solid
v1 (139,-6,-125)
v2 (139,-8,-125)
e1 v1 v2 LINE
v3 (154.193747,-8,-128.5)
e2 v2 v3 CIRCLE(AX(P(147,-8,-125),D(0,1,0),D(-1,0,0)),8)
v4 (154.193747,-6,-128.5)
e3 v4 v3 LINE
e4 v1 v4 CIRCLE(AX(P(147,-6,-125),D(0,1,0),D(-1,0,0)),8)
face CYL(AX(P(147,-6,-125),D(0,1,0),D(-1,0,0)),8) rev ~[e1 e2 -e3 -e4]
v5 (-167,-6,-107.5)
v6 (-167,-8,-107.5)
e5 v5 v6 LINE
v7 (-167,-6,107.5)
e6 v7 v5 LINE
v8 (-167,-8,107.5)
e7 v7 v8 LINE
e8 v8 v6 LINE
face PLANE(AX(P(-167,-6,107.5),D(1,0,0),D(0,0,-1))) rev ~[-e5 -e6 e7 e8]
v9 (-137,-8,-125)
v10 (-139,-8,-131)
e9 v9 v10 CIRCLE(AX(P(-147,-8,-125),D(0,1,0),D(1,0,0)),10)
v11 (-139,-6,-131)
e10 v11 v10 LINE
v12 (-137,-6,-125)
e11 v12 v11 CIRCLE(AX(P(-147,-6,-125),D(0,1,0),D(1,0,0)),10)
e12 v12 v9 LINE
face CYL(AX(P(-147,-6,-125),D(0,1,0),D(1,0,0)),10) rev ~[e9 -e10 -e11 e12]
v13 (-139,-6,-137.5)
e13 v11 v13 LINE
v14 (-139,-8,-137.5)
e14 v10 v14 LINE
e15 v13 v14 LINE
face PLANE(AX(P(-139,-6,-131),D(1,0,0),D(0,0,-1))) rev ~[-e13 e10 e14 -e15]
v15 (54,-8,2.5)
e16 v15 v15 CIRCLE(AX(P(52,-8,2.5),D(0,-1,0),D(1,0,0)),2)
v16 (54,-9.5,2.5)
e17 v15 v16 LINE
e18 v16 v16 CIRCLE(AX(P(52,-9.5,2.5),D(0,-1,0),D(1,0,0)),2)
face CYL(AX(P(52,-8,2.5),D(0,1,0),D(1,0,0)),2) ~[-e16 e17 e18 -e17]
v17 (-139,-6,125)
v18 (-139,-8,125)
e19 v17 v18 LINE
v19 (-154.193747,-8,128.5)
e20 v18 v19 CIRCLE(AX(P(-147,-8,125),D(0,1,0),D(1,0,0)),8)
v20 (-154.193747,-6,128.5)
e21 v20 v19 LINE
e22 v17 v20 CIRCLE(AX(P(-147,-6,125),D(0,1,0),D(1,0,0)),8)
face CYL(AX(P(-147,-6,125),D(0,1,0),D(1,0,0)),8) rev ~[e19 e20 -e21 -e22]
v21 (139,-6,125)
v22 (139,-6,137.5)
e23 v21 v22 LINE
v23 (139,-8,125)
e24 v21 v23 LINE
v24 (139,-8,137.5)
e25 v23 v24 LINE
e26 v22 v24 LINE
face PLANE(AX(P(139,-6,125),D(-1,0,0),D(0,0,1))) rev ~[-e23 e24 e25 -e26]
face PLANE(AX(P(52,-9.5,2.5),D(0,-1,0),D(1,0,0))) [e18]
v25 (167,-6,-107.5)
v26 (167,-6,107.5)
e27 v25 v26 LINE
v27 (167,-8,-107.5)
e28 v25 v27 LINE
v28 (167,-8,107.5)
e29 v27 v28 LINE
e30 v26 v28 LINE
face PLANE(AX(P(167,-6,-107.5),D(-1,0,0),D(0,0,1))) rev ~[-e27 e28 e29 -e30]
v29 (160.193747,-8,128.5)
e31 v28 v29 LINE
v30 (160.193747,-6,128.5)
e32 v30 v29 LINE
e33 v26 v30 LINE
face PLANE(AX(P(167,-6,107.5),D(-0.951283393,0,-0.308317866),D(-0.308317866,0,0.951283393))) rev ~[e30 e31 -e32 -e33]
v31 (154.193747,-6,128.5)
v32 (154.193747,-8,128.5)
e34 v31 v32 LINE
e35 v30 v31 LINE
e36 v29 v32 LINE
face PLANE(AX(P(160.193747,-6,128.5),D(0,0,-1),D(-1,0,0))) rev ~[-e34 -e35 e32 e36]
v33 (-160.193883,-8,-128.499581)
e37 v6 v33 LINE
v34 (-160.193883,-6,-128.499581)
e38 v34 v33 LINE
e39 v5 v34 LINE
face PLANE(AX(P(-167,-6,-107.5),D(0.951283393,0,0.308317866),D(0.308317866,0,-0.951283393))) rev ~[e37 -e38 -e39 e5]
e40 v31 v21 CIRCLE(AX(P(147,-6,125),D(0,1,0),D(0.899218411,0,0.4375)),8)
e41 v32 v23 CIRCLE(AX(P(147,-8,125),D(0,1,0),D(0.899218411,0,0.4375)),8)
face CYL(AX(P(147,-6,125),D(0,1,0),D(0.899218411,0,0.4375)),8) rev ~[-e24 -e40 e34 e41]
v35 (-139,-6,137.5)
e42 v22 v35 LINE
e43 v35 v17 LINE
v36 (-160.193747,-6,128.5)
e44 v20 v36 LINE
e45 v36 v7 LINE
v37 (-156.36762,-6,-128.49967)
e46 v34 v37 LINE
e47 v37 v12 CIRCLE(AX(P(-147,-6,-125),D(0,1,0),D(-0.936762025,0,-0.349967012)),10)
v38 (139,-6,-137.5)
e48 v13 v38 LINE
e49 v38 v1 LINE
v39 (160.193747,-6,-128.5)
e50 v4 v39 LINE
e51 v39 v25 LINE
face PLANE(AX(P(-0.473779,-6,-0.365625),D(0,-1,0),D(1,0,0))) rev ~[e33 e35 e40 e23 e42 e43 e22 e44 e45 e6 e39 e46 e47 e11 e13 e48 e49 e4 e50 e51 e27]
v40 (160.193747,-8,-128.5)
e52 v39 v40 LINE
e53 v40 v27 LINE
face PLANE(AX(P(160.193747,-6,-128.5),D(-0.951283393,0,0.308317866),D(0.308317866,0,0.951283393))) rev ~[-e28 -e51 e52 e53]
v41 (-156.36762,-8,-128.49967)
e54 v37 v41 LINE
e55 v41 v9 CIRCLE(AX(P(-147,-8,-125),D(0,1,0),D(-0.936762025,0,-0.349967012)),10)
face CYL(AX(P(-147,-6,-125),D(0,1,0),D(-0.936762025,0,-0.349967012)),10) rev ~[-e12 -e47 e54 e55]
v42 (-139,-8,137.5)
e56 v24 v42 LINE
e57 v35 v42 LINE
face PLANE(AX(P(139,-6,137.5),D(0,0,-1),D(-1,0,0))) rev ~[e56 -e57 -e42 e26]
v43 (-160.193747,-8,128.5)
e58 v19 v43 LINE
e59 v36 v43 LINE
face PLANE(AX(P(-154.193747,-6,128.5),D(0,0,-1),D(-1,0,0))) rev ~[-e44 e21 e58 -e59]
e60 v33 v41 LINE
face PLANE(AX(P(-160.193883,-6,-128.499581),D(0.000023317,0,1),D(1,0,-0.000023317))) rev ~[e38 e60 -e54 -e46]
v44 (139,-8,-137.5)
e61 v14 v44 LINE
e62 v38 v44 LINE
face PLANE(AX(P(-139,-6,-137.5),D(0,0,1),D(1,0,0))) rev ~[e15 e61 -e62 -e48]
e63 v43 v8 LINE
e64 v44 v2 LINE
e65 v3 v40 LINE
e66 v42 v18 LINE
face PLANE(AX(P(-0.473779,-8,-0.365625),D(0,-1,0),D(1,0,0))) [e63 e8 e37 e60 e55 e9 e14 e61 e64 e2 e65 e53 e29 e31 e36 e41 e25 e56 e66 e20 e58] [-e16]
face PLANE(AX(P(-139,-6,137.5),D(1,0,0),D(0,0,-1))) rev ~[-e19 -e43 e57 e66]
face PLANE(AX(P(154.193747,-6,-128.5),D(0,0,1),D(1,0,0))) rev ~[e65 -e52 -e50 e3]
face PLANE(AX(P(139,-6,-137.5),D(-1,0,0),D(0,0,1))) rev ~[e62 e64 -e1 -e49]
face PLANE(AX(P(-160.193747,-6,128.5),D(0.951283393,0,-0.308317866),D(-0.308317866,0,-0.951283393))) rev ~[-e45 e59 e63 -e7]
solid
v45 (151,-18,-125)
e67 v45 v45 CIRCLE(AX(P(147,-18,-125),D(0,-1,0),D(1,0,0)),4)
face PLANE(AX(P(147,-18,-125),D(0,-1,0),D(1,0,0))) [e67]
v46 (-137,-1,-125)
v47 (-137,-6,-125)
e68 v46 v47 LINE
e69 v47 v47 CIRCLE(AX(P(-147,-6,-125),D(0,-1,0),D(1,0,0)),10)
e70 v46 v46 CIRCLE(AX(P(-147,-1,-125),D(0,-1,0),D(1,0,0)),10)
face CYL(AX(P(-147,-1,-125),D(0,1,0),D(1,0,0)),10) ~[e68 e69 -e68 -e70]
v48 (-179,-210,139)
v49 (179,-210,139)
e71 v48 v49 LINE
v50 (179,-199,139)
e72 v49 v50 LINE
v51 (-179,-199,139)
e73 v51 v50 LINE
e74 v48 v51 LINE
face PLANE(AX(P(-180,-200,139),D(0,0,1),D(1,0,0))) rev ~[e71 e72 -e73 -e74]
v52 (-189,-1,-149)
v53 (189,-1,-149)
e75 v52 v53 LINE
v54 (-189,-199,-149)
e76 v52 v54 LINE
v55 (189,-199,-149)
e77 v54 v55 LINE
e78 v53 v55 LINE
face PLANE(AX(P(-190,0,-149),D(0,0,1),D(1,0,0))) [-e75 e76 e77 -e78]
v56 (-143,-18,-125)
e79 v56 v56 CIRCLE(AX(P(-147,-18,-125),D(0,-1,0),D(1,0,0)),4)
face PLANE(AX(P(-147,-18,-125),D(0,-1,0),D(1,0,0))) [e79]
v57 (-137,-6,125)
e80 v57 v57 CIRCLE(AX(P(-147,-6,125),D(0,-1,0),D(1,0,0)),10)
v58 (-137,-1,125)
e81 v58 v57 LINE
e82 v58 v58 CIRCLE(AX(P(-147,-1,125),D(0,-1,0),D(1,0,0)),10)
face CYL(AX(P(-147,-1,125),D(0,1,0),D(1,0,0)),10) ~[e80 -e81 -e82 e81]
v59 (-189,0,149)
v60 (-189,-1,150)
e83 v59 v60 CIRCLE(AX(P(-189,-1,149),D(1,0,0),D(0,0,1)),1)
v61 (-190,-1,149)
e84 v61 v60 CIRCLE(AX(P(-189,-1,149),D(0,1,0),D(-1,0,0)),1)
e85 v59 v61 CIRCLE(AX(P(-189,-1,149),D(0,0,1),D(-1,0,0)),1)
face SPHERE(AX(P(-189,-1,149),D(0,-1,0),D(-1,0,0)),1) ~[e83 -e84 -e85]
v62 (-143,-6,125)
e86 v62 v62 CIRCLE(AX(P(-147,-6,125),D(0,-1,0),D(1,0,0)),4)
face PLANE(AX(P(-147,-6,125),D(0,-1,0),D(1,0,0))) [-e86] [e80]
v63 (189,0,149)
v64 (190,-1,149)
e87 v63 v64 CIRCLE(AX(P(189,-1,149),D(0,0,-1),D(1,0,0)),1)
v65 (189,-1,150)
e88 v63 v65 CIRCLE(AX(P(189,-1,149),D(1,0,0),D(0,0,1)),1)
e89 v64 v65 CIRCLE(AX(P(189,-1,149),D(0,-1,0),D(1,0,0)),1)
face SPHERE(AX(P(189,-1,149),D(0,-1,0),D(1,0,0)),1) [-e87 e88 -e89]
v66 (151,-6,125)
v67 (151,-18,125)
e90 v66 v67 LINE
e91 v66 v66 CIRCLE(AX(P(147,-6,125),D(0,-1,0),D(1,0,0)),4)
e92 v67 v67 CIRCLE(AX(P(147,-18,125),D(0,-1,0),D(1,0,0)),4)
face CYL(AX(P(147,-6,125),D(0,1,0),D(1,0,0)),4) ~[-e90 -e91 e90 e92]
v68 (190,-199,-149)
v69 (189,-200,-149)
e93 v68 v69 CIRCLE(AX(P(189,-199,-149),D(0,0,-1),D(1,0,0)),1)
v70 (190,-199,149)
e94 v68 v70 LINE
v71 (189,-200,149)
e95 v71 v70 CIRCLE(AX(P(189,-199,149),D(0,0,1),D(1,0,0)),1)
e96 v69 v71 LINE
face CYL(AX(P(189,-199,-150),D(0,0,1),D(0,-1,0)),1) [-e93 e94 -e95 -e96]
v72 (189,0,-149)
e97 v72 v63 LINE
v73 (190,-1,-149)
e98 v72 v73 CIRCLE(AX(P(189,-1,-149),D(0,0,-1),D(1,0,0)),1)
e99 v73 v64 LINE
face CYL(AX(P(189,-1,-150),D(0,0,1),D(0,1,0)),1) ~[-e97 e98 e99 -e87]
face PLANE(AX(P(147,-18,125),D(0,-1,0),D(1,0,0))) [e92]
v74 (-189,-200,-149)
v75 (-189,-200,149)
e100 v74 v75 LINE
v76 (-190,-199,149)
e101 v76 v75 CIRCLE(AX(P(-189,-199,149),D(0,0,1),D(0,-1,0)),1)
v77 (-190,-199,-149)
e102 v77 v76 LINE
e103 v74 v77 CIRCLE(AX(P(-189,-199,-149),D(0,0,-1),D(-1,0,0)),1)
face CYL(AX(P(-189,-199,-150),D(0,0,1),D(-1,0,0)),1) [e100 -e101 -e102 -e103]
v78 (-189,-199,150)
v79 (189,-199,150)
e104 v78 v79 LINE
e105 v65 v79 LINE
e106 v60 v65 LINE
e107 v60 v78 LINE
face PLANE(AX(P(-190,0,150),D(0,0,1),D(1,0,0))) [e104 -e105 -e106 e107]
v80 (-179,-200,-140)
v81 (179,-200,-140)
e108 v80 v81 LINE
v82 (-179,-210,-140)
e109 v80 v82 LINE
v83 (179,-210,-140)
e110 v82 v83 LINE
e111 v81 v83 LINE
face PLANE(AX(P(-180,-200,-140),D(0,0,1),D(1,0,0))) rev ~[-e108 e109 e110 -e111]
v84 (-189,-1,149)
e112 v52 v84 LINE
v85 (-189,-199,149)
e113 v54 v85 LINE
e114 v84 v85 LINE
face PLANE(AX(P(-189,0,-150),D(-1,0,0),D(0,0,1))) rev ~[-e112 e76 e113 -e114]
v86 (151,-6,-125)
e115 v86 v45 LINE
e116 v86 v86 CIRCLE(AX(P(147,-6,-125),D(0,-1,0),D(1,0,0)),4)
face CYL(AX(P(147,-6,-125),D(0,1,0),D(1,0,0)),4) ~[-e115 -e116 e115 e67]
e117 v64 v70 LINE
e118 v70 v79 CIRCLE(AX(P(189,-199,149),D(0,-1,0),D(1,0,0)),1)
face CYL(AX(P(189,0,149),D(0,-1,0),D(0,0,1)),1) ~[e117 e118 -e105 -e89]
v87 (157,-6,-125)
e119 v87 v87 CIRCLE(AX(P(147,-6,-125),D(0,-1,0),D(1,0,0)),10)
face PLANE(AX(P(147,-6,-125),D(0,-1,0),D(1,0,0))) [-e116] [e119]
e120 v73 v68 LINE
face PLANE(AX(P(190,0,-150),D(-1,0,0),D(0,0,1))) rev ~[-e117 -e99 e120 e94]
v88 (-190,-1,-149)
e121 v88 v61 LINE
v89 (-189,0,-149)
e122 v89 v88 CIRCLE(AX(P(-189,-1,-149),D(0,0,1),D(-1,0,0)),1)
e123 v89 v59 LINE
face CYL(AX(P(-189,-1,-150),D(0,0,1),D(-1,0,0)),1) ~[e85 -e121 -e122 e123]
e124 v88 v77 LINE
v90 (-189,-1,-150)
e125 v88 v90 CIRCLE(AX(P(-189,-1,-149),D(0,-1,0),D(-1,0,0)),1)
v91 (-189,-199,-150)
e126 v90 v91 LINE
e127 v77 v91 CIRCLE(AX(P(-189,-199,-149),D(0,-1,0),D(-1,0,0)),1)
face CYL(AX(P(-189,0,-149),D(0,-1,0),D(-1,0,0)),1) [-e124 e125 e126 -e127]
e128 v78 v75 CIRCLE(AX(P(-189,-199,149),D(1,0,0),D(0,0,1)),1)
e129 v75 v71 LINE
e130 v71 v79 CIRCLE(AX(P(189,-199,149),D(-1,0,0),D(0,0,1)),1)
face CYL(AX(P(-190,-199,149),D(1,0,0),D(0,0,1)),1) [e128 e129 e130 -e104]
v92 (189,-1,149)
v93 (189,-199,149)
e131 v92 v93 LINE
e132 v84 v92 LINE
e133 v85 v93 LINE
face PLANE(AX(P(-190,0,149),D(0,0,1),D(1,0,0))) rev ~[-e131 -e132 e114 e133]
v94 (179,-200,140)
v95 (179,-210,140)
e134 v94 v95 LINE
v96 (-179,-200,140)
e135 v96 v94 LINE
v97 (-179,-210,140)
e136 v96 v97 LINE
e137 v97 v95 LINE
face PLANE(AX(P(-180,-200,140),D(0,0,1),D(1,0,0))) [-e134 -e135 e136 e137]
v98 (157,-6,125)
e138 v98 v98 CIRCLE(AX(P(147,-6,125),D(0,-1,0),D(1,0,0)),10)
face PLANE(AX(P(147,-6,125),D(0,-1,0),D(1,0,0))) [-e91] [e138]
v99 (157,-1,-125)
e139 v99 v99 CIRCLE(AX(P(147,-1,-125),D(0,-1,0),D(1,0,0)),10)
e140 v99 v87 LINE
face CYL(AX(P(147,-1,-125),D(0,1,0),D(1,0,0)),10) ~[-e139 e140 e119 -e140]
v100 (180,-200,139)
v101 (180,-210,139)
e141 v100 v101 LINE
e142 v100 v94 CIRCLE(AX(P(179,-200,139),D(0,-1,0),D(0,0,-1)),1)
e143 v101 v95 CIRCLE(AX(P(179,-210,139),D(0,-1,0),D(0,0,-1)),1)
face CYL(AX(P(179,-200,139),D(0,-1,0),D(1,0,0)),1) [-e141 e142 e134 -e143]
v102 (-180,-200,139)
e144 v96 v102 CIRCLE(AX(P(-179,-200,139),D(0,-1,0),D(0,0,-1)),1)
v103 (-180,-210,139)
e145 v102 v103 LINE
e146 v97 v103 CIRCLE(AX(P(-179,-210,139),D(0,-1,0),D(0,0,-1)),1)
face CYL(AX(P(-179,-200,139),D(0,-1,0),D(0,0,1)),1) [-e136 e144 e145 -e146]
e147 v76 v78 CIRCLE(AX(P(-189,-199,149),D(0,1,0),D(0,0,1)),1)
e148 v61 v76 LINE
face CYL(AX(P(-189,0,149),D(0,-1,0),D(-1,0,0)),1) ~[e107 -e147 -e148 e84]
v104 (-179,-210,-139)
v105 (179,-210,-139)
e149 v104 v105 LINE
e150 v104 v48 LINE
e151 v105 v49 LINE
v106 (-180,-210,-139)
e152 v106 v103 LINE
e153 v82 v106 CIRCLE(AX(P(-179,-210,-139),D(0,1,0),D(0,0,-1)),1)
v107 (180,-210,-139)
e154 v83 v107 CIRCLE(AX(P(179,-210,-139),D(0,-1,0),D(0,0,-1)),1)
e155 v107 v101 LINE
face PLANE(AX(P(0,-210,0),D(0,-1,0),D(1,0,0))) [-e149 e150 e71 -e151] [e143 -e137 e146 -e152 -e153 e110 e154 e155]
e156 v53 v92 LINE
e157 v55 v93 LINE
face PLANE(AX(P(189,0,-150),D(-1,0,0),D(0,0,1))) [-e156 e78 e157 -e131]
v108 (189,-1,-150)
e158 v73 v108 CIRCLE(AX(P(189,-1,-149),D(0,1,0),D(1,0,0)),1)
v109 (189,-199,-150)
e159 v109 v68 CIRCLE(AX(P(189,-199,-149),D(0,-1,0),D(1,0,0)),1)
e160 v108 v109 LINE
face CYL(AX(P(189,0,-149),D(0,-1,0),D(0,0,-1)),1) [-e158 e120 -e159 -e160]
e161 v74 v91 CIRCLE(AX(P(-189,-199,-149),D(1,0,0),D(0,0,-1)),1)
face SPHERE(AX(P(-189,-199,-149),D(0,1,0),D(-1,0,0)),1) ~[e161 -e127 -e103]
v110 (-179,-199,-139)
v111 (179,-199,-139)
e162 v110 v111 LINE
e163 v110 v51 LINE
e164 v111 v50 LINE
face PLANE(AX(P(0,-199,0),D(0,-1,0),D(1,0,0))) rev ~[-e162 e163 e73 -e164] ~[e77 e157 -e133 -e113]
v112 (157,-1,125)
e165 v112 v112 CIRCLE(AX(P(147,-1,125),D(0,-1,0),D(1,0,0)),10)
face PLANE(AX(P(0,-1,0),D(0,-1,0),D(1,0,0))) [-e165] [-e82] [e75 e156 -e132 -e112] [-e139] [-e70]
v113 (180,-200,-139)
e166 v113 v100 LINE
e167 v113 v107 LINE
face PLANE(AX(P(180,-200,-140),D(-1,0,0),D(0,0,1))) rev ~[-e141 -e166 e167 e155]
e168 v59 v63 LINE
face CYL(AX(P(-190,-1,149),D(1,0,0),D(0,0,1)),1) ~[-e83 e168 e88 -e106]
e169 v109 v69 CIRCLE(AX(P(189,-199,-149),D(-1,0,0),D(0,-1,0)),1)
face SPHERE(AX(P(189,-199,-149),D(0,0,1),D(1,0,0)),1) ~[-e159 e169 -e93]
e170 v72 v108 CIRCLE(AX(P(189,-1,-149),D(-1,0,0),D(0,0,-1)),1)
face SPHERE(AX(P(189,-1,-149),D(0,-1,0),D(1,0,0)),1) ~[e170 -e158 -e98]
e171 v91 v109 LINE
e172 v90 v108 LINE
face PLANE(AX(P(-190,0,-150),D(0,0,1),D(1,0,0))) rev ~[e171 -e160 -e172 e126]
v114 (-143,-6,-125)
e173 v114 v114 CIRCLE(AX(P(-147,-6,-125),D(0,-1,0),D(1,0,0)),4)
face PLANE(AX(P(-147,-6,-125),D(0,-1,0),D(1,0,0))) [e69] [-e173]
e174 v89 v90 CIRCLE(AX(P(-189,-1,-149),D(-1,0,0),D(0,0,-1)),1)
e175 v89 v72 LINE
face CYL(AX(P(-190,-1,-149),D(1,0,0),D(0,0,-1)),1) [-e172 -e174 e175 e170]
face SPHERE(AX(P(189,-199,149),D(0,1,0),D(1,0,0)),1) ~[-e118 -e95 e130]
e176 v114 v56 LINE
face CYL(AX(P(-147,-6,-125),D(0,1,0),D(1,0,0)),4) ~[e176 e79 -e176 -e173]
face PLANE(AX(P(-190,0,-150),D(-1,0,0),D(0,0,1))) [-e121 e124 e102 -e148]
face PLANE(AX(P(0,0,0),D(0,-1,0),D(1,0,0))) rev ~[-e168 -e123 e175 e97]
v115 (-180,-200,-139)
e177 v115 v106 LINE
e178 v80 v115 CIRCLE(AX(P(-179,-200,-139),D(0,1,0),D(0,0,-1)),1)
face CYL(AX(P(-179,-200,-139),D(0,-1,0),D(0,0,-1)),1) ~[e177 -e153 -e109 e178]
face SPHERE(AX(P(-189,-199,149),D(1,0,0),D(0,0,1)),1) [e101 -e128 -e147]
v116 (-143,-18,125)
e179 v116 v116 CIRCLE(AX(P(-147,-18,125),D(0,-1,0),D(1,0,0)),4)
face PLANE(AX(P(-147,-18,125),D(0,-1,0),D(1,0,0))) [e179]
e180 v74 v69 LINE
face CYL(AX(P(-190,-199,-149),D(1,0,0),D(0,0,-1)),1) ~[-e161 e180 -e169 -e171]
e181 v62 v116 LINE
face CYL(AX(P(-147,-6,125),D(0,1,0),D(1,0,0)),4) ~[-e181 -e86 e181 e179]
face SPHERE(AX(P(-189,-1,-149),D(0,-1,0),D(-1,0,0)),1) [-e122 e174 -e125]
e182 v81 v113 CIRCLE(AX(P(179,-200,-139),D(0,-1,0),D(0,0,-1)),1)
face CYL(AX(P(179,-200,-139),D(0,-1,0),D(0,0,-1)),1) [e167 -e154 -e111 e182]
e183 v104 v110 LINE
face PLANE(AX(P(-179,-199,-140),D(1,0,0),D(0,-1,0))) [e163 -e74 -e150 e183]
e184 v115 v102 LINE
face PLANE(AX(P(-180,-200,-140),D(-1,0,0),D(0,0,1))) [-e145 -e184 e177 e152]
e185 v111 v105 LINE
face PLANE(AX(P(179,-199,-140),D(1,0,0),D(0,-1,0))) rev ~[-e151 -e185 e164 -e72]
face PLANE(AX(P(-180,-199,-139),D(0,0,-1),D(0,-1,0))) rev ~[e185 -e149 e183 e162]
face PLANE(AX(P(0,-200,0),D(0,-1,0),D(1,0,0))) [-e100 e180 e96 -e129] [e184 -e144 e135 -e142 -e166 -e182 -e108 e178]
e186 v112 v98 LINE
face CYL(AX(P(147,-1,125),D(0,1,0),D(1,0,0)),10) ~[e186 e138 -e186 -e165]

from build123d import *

# Parameters (mm, degrees)
F0_W         = 380
F0_H         = 300
F1_DEPTH     = 200
F2_W         = 360
F2_H         = 280
F3_DEPTH     = 10
F4_R         = 1
F5_T         = 1
F5_T3_DEPTH  = 280
F5_T5_DEPTH  = 360
F5_T8_ANGLE  = 90.000000001
F5_T10_ANGLE = 90.000000001
F5_T12_ANGLE = 90.000000001
F5_T14_ANGLE = 90.000000001
F6_R         = 10
F6_R_2       = 4
F7_DEPTH     = 5
F8_R         = 4
F9_DEPTH     = 12
F11_DEPTH    = 2
F12_R        = 2
F13_DEPTH    = 1.5


# Not quite as in the source:
# - a shell that OpenCascade refuses in one call is made with other operations: the cavity is built on its own and cut out


with BuildPart() as f1:
    # F0 (on Front) → F1 (new body)
    with BuildSketch(Plane.XZ):
        Rectangle(F0_W, F0_H)
    extrude(amount=F1_DEPTH)

    # F2 (on face) → F3 (join)
    with BuildSketch(Plane.XZ.offset(200)):
        Rectangle(F2_W, F2_H)
    extrude(amount=F3_DEPTH)

    # F4
    f4_edges = [f1.edges().sort_by_distance(p)[0] for p in [
        (190, -100, 150),
        (190, -200, 0),
        (190, -100, -150),
        (190, 0, 0),
        (0, -200, 150),
        (-190, -100, 150),
        (-190, -100, -150),
        (-190, -200, 0),
        (-190, 0, 0),
        (0, 0, 150),
        (0, -200, -150),
        (0, 0, -150),
        (180, -205, 140),
        (-180, -205, 140),
        (180, -205, -140),
        (-180, -205, -140),
    ]]
    fillet(f4_edges, radius=F4_R)

    # F5: shell of thickness 1, made by hand


with BuildPart() as f5_core1:
    # F5_t2: copy of F1
    add(f1.part)

    # the walls: a layer under each face that stays
    f5_faces = [f5_core1.faces().sort_by_distance(p)[0] for p in [
        (190, -100, 0),
        (0, -100, 150),
        (0, 0, 0),
        (129.9375, -200, -145.3209876543),
        (0, -100, -150),
        (180, -205, 0),
        (0, -205, -140),
        (0, -205, 140),
        (-180, -205, 0),
        (-190, -100, 0),
    ]]
    thicken(f5_faces, amount=-F5_T, mode=Mode.SUBTRACT)

    # F5_s4 → F5_t3 (cut)
    with BuildSketch(Plane.XY.offset(-140)):
        Polygon((180.01, -200.01), (180, -199), (179, -199), (179, -200), align=None)
        Polygon((-180.01, -200.01), (-180, -199), (-179, -199), (-179, -200), align=None)
    extrude(amount=F5_T3_DEPTH, mode=Mode.SUBTRACT)

    # F5_s6 → F5_t5 (cut)
    with BuildSketch(Plane.YZ.offset(-180)):
        Polygon((-200.01, -140.01), (-199, -140), (-199, -139), (-200, -139), align=None)
        Polygon((-200.01, 140.01), (-199, 140), (-199, 139), (-200, 139), align=None)
    extrude(amount=F5_T5_DEPTH, mode=Mode.SUBTRACT)

    # F5_s7 → F5_t8 (revolve, cut)
    with BuildSketch(Plane.XY.offset(-139)):
        Polygon((180.01, -200.01), (180, -199), (179, -199), (179, -200), align=None)
    revolve(axis=Axis((179, -200, -139), (0, 1, 0)), revolution_arc=F5_T8_ANGLE, mode=Mode.SUBTRACT)

    # F5_s9 → F5_t10 (revolve, cut)
    with BuildSketch(Plane.XY.offset(139)):
        Polygon((180.01, -200.01), (180, -199), (179, -199), (179, -200), align=None)
    revolve(axis=Axis((179, -200, 139), (0, -1, 0)), revolution_arc=F5_T10_ANGLE, mode=Mode.SUBTRACT)

    # F5_s11 → F5_t12 (revolve, cut)
    with BuildSketch(Plane.XY.offset(-139)):
        Polygon((-180.01, -200.01), (-180, -199), (-179, -199), (-179, -200), align=None)
    revolve(axis=Axis((-179, -200, -139), (0, -1, 0)), revolution_arc=F5_T12_ANGLE, mode=Mode.SUBTRACT)

    # F5_s13 → F5_t14 (revolve, cut)
    with BuildSketch(Plane.YZ.offset(-179)):
        Polygon((-200.01, 140.01), (-199, 140), (-199, 139), (-200, 139), align=None)
    revolve(axis=Axis((-179, -200, 139), (0, -1, 0)), revolution_arc=F5_T14_ANGLE, mode=Mode.SUBTRACT)


with BuildPart() as f1_1:
    add(f1.part)

    # what is left inside the walls is the cavity
    f5_cavity = [f5_core1.part.solids().sort_by_distance(p)[0] for p in [
        (0, -1.01, -49.666667),
    ]]
    add(f5_cavity, mode=Mode.SUBTRACT)

    # F6 (on face) → F7 (join)
    with BuildSketch(Plane.XZ.offset(1)):
        with Locations((-147, -125)):
            Circle(F6_R)
        with Locations((-147, -125)):
            Circle(F6_R_2, mode=Mode.SUBTRACT)
        with Locations((-147, -125)):
            Circle(F6_R_2)
        with Locations((147, 125)):
            Circle(F6_R)
        with Locations((147, 125)):
            Circle(F6_R_2, mode=Mode.SUBTRACT)
        with Locations((147, 125)):
            Circle(F6_R_2)
        with Locations((-147, 125)):
            Circle(F6_R)
        with Locations((-147, 125)):
            Circle(F6_R_2, mode=Mode.SUBTRACT)
        with Locations((-147, 125)):
            Circle(F6_R_2)
        with Locations((147, -125)):
            Circle(F6_R)
        with Locations((147, -125)):
            Circle(F6_R_2, mode=Mode.SUBTRACT)
        with Locations((147, -125)):
            Circle(F6_R_2)
    extrude(amount=F7_DEPTH)

    # F8 (on face) → F9 (join)
    with BuildSketch(Plane.XZ.offset(6)):
        with Locations((-147, 125)):
            Circle(F8_R)
        with Locations((147, 125)):
            Circle(F8_R)
        with Locations((-147, -125)):
            Circle(F8_R)
        with Locations((147, -125)):
            Circle(F8_R)
    extrude(amount=F9_DEPTH)


with BuildPart() as f11:
    # F10 (on face) → F11 (new body)
    with BuildSketch(Plane.XZ.offset(6)):
        with BuildLine():
            Line((139, 125), (139, 137.5))
            Line((139, 137.5), (-139, 137.5))
            Line((-139, 137.5), (-139, 125))
            ThreePointArc((-139, 125), (-148.7958315233, 117.2041684767), (-154.193747285, 128.5))
            Line((-154.193747285, 128.5), (-160.193747285, 128.5))
            Line((-160.193747285, 128.5), (-167, 107.5))
            Line((-167, 107.5), (-167, -107.5))
            Line((-167, -107.5), (-160.1938831182, -128.4995809004))
            Line((-160.1938831182, -128.4995809004), (-156.3676202463, -128.4996701162))
            ThreePointArc((-156.3676202463, -128.4996701162), (-148.7781728737, -115.1593647953), (-137, -125))
            ThreePointArc((-137, -125), (-137.5131670195, -128.1622776602), (-139, -131))
            Line((-139, -131), (-139, -137.5))
            Line((-139, -137.5), (-137, -137.5))
            Line((-137, -137.5), (139, -137.5))
            Line((139, -137.5), (139, -125))
            ThreePointArc((139, -125), (148.7958315233, -117.2041684767), (154.193747285, -128.5))
            Line((154.193747285, -128.5), (160.193747285, -128.5))
            Line((160.193747285, -128.5), (167, -107.5))
            Line((167, -107.5), (167, 107.5))
            Line((167, 107.5), (160.193747285, 128.5))
            Line((160.193747285, 128.5), (154.193747285, 128.5))
            ThreePointArc((154.193747285, 128.5), (148.7958315233, 117.2041684767), (139, 125))
        make_face()
    extrude(amount=F11_DEPTH)

    # F12 (on face) → F13 (join)
    with BuildSketch(Plane.XZ.offset(8)):
        with Locations((52, 2.5)):
            Circle(F12_R)
    extrude(amount=F13_DEPTH)


solid = Compound([f1_1.part, f11.part])
